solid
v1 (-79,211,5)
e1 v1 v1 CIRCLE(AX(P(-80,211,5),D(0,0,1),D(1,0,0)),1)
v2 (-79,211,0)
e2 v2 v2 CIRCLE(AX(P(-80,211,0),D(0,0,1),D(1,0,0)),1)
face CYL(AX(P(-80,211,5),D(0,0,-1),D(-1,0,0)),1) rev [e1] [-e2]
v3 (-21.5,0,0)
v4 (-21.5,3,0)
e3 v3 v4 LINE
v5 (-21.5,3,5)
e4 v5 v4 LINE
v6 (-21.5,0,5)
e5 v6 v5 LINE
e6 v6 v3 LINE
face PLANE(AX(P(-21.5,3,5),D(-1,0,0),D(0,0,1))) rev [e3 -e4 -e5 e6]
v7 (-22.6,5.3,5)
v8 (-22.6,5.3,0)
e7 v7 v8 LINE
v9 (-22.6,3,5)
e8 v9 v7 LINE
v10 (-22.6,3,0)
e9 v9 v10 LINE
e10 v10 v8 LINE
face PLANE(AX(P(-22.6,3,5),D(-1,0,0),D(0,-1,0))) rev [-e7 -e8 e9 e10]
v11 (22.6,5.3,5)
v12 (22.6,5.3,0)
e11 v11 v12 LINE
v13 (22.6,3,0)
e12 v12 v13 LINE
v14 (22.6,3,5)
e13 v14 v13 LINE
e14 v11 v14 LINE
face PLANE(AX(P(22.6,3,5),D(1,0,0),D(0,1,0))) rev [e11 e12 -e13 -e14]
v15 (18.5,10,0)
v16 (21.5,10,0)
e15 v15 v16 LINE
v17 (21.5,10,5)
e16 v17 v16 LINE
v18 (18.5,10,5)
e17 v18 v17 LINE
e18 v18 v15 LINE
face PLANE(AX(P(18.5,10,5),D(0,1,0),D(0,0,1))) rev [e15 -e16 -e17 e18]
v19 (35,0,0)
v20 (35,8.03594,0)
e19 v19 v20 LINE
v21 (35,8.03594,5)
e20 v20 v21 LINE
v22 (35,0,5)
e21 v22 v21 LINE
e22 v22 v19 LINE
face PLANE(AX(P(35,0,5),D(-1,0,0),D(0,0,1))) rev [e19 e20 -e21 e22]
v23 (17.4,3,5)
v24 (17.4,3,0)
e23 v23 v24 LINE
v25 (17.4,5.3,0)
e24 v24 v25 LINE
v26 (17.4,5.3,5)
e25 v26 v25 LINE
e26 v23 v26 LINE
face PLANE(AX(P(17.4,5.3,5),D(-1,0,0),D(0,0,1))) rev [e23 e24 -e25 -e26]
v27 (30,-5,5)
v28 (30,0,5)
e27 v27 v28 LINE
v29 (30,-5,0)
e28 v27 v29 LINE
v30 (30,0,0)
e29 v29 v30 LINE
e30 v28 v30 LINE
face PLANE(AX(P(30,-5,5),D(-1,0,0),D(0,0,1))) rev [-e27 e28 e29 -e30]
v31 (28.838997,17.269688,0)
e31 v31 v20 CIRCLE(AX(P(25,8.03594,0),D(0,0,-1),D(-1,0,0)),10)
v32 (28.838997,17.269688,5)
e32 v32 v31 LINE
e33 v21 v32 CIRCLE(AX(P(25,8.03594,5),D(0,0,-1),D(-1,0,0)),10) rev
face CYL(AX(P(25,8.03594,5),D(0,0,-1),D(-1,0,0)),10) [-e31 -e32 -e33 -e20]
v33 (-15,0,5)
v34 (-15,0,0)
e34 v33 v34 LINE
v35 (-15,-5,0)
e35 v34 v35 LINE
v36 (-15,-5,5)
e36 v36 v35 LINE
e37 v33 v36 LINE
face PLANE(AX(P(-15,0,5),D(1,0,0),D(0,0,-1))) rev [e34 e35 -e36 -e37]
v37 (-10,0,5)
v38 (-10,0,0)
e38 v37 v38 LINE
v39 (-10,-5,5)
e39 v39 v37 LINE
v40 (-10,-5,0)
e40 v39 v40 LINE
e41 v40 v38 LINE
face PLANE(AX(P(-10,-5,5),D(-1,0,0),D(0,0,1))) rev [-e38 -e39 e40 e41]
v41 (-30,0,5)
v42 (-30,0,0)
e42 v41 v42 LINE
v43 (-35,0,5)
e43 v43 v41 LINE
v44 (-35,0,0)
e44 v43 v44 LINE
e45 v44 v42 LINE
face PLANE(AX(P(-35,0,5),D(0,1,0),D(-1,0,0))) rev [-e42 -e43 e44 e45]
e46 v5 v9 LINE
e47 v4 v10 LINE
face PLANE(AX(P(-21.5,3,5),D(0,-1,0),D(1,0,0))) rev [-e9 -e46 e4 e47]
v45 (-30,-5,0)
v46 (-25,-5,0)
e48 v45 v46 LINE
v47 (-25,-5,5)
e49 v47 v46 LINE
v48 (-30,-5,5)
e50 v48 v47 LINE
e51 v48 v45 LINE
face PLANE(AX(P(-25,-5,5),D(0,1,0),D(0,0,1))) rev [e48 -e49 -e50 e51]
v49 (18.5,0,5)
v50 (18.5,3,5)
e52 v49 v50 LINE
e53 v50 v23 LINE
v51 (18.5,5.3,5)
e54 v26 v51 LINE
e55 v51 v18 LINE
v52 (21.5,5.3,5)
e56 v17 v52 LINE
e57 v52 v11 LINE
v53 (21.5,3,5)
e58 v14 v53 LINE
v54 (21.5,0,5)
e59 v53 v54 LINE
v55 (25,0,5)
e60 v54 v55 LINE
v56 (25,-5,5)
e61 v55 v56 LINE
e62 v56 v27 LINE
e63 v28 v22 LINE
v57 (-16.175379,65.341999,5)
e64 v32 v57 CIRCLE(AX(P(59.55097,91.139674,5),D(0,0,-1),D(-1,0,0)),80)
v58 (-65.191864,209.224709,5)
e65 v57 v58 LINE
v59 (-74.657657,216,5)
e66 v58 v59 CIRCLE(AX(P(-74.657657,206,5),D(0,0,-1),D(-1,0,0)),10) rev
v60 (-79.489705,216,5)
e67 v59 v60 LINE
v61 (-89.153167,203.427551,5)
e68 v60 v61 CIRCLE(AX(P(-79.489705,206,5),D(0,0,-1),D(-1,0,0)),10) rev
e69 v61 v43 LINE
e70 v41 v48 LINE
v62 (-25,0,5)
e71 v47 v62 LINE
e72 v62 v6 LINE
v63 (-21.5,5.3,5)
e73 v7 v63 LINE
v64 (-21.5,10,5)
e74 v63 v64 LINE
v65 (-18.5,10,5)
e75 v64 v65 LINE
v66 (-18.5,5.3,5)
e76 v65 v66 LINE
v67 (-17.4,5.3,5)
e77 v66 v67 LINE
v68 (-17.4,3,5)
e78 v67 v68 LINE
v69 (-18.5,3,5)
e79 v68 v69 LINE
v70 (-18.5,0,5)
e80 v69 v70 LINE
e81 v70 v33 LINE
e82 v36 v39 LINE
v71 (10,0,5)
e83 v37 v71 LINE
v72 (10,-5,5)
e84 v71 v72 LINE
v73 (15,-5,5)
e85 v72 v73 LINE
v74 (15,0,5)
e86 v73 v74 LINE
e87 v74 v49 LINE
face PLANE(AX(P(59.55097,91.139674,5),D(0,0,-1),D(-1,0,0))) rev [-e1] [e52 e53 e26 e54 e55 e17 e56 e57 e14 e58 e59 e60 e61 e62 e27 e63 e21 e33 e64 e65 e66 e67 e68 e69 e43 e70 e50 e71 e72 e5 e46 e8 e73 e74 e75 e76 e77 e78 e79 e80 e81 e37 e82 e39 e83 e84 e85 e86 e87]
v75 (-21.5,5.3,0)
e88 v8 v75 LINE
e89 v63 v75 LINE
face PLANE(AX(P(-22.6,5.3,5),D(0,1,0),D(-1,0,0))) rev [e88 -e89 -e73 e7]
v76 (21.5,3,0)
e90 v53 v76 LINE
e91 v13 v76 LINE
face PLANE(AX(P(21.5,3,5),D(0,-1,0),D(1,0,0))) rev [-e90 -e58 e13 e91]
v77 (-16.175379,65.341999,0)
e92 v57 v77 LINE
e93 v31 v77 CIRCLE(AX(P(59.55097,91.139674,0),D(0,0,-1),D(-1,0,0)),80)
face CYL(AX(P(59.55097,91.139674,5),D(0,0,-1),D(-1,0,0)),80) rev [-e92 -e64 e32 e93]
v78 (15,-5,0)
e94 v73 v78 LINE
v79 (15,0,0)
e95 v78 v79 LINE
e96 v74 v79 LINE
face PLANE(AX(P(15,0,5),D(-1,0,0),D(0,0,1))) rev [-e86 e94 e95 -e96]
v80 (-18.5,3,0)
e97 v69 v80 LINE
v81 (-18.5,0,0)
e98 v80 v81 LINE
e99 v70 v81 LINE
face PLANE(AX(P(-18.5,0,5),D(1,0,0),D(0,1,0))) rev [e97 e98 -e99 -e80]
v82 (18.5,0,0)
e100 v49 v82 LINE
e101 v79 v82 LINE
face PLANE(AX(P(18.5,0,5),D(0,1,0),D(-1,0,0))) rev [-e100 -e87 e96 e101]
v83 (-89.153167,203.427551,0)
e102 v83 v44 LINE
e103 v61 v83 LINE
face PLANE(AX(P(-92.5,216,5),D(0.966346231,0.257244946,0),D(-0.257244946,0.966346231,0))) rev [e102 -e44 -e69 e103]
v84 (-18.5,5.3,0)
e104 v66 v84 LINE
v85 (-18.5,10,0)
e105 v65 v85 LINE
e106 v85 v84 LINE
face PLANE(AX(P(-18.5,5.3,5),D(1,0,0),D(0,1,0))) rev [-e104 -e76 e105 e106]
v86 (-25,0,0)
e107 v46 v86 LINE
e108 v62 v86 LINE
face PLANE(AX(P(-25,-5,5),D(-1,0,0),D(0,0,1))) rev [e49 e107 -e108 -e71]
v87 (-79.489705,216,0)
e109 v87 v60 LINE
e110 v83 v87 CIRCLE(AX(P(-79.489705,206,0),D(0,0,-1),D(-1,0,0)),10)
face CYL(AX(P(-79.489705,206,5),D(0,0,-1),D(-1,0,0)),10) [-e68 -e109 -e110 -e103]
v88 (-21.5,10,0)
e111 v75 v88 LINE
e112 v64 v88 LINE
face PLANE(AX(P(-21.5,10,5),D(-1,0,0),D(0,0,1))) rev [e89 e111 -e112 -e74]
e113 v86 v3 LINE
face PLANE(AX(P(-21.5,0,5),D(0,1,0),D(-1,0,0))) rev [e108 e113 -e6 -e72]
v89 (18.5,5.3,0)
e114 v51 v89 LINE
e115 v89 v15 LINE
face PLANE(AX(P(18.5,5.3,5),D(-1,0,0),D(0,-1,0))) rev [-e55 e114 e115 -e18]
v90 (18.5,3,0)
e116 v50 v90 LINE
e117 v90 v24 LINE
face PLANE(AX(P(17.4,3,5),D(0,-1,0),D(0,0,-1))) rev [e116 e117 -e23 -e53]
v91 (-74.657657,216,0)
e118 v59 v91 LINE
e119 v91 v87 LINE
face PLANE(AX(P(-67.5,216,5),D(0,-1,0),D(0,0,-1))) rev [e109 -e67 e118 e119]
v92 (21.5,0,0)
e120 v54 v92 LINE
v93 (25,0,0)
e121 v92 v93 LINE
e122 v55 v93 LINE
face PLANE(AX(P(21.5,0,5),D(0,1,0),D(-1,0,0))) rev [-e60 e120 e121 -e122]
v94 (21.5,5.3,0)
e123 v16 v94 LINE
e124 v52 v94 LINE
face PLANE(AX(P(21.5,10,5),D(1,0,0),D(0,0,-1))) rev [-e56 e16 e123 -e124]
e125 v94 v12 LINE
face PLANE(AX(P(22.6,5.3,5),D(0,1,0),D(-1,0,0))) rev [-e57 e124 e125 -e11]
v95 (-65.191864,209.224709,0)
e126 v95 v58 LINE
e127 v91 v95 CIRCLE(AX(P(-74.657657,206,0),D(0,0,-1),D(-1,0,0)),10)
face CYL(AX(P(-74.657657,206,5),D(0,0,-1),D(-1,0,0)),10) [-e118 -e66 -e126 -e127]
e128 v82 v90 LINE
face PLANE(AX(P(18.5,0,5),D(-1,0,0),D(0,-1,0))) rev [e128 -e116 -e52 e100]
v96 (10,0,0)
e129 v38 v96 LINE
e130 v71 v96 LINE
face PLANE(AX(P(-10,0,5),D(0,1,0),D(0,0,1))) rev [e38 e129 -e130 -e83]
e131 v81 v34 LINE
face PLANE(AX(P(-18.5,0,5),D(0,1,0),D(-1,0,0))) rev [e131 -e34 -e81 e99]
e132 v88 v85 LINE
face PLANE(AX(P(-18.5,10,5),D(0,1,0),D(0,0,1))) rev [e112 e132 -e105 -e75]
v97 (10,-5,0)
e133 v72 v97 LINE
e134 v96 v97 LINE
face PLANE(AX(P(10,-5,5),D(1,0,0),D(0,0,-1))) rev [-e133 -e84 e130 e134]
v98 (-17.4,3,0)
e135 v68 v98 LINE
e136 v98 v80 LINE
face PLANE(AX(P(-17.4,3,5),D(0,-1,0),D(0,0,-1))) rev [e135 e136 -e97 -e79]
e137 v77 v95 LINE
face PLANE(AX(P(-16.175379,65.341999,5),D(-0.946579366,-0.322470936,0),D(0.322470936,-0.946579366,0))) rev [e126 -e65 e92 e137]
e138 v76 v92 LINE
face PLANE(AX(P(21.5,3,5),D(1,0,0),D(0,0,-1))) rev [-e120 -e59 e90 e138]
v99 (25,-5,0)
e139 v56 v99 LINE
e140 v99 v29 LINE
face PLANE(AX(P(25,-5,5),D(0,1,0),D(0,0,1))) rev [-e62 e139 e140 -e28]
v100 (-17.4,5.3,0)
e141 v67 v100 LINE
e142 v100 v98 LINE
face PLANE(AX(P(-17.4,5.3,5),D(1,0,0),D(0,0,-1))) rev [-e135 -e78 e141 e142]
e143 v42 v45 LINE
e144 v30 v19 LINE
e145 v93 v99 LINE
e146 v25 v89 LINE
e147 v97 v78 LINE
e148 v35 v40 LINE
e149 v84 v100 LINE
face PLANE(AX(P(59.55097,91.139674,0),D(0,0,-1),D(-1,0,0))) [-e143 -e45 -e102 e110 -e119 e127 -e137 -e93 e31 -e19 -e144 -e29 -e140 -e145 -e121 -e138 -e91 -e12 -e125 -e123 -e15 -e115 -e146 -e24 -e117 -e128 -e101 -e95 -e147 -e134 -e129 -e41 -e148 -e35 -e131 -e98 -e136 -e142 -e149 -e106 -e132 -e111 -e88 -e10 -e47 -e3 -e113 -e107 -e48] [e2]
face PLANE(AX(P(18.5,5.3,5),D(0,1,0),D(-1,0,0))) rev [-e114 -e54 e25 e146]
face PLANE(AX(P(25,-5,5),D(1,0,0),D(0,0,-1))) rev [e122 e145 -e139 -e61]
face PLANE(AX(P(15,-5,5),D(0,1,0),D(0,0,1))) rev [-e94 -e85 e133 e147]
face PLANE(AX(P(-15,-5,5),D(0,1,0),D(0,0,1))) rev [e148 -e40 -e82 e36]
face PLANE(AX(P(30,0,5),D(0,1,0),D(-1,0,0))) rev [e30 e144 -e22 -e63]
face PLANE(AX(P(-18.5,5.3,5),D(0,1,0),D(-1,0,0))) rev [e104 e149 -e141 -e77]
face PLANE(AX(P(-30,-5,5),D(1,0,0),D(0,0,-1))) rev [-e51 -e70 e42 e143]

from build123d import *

# Parameters (mm, degrees)
BOSS_EXTRU_1_OUTLINE_R = 1
BOSS_EXTRU_1_DEPTH     = 5
CONG_1_R               = 10


# Read off the part's stored shape, not the designer's step: Boss.-Extru.1
with BuildPart() as part:
    # Boss.-Extru.1 outline → Boss.-Extru.1 (new body)
    with BuildSketch(Plane.XY):
        with BuildLine():
            Line((-67.5, 216), (-92.5, 216))
            Line((-92.5, 216), (-35, 0))
            Line((-35, 0), (-30, 0))
            Line((-30, 0), (-30, -5))
            Line((-30, -5), (-25, -5))
            Line((-25, -5), (-25, 0))
            Line((-25, 0), (-21.5, 0))
            Line((-21.5, 0), (-21.5, 3))
            Line((-21.5, 3), (-22.6, 3))
            Line((-22.6, 3), (-22.6, 5.3))
            Line((-22.6, 5.3), (-21.5, 5.3))
            Line((-21.5, 5.3), (-21.5, 10))
            Line((-21.5, 10), (-18.5, 10))
            Line((-18.5, 10), (-18.5, 5.3))
            Line((-18.5, 5.3), (-17.4, 5.3))
            Line((-17.4, 5.3), (-17.4, 3))
            Line((-17.4, 3), (-18.5, 3))
            Line((-18.5, 3), (-18.5, 0))
            Line((-18.5, 0), (-15, 0))
            Line((-15, 0), (-15, -5))
            Line((-15, -5), (-10, -5))
            Line((-10, -5), (-10, 0))
            Line((-10, 0), (10, 0))
            Line((10, 0), (10, -5))
            Line((10, -5), (15, -5))
            Line((15, -5), (15, 0))
            Line((15, 0), (18.5, 0))
            Line((18.5, 0), (18.5, 3))
            Line((18.5, 3), (17.4, 3))
            Line((17.4, 3), (17.4, 5.3))
            Line((17.4, 5.3), (18.5, 5.3))
            Line((18.5, 5.3), (18.5, 10))
            Line((18.5, 10), (21.5, 10))
            Line((21.5, 10), (21.5, 5.3))
            Line((21.5, 5.3), (22.6, 5.3))
            Line((22.6, 5.3), (22.6, 3))
            Line((22.6, 3), (21.5, 3))
            Line((21.5, 3), (21.5, 0))
            Line((21.5, 0), (25, 0))
            Line((25, 0), (25, -5))
            Line((25, -5), (30, -5))
            Line((30, -5), (30, 0))
            Line((30, 0), (35, 0))
            Line((35, 0), (35, 15))
            ThreePointArc((35, 15), (3.448702598, 34.108667771), (-16.175379452, 65.341998613))
            Line((-16.175379452, 65.341998613), (-67.5, 216))
        make_face()
        with Locations((-80, 211)):
            Circle(BOSS_EXTRU_1_OUTLINE_R, mode=Mode.SUBTRACT)
    extrude(amount=BOSS_EXTRU_1_DEPTH)

    # Congé1
    cong_1_edges = [part.edges().sort_by_distance(p)[0] for p in [
        (-67.5, 216, 2.5),
        (35, 15, 2.5),
        (-92.5, 216, 2.5),
    ]]
    fillet(cong_1_edges, radius=CONG_1_R)


solid = part.part
